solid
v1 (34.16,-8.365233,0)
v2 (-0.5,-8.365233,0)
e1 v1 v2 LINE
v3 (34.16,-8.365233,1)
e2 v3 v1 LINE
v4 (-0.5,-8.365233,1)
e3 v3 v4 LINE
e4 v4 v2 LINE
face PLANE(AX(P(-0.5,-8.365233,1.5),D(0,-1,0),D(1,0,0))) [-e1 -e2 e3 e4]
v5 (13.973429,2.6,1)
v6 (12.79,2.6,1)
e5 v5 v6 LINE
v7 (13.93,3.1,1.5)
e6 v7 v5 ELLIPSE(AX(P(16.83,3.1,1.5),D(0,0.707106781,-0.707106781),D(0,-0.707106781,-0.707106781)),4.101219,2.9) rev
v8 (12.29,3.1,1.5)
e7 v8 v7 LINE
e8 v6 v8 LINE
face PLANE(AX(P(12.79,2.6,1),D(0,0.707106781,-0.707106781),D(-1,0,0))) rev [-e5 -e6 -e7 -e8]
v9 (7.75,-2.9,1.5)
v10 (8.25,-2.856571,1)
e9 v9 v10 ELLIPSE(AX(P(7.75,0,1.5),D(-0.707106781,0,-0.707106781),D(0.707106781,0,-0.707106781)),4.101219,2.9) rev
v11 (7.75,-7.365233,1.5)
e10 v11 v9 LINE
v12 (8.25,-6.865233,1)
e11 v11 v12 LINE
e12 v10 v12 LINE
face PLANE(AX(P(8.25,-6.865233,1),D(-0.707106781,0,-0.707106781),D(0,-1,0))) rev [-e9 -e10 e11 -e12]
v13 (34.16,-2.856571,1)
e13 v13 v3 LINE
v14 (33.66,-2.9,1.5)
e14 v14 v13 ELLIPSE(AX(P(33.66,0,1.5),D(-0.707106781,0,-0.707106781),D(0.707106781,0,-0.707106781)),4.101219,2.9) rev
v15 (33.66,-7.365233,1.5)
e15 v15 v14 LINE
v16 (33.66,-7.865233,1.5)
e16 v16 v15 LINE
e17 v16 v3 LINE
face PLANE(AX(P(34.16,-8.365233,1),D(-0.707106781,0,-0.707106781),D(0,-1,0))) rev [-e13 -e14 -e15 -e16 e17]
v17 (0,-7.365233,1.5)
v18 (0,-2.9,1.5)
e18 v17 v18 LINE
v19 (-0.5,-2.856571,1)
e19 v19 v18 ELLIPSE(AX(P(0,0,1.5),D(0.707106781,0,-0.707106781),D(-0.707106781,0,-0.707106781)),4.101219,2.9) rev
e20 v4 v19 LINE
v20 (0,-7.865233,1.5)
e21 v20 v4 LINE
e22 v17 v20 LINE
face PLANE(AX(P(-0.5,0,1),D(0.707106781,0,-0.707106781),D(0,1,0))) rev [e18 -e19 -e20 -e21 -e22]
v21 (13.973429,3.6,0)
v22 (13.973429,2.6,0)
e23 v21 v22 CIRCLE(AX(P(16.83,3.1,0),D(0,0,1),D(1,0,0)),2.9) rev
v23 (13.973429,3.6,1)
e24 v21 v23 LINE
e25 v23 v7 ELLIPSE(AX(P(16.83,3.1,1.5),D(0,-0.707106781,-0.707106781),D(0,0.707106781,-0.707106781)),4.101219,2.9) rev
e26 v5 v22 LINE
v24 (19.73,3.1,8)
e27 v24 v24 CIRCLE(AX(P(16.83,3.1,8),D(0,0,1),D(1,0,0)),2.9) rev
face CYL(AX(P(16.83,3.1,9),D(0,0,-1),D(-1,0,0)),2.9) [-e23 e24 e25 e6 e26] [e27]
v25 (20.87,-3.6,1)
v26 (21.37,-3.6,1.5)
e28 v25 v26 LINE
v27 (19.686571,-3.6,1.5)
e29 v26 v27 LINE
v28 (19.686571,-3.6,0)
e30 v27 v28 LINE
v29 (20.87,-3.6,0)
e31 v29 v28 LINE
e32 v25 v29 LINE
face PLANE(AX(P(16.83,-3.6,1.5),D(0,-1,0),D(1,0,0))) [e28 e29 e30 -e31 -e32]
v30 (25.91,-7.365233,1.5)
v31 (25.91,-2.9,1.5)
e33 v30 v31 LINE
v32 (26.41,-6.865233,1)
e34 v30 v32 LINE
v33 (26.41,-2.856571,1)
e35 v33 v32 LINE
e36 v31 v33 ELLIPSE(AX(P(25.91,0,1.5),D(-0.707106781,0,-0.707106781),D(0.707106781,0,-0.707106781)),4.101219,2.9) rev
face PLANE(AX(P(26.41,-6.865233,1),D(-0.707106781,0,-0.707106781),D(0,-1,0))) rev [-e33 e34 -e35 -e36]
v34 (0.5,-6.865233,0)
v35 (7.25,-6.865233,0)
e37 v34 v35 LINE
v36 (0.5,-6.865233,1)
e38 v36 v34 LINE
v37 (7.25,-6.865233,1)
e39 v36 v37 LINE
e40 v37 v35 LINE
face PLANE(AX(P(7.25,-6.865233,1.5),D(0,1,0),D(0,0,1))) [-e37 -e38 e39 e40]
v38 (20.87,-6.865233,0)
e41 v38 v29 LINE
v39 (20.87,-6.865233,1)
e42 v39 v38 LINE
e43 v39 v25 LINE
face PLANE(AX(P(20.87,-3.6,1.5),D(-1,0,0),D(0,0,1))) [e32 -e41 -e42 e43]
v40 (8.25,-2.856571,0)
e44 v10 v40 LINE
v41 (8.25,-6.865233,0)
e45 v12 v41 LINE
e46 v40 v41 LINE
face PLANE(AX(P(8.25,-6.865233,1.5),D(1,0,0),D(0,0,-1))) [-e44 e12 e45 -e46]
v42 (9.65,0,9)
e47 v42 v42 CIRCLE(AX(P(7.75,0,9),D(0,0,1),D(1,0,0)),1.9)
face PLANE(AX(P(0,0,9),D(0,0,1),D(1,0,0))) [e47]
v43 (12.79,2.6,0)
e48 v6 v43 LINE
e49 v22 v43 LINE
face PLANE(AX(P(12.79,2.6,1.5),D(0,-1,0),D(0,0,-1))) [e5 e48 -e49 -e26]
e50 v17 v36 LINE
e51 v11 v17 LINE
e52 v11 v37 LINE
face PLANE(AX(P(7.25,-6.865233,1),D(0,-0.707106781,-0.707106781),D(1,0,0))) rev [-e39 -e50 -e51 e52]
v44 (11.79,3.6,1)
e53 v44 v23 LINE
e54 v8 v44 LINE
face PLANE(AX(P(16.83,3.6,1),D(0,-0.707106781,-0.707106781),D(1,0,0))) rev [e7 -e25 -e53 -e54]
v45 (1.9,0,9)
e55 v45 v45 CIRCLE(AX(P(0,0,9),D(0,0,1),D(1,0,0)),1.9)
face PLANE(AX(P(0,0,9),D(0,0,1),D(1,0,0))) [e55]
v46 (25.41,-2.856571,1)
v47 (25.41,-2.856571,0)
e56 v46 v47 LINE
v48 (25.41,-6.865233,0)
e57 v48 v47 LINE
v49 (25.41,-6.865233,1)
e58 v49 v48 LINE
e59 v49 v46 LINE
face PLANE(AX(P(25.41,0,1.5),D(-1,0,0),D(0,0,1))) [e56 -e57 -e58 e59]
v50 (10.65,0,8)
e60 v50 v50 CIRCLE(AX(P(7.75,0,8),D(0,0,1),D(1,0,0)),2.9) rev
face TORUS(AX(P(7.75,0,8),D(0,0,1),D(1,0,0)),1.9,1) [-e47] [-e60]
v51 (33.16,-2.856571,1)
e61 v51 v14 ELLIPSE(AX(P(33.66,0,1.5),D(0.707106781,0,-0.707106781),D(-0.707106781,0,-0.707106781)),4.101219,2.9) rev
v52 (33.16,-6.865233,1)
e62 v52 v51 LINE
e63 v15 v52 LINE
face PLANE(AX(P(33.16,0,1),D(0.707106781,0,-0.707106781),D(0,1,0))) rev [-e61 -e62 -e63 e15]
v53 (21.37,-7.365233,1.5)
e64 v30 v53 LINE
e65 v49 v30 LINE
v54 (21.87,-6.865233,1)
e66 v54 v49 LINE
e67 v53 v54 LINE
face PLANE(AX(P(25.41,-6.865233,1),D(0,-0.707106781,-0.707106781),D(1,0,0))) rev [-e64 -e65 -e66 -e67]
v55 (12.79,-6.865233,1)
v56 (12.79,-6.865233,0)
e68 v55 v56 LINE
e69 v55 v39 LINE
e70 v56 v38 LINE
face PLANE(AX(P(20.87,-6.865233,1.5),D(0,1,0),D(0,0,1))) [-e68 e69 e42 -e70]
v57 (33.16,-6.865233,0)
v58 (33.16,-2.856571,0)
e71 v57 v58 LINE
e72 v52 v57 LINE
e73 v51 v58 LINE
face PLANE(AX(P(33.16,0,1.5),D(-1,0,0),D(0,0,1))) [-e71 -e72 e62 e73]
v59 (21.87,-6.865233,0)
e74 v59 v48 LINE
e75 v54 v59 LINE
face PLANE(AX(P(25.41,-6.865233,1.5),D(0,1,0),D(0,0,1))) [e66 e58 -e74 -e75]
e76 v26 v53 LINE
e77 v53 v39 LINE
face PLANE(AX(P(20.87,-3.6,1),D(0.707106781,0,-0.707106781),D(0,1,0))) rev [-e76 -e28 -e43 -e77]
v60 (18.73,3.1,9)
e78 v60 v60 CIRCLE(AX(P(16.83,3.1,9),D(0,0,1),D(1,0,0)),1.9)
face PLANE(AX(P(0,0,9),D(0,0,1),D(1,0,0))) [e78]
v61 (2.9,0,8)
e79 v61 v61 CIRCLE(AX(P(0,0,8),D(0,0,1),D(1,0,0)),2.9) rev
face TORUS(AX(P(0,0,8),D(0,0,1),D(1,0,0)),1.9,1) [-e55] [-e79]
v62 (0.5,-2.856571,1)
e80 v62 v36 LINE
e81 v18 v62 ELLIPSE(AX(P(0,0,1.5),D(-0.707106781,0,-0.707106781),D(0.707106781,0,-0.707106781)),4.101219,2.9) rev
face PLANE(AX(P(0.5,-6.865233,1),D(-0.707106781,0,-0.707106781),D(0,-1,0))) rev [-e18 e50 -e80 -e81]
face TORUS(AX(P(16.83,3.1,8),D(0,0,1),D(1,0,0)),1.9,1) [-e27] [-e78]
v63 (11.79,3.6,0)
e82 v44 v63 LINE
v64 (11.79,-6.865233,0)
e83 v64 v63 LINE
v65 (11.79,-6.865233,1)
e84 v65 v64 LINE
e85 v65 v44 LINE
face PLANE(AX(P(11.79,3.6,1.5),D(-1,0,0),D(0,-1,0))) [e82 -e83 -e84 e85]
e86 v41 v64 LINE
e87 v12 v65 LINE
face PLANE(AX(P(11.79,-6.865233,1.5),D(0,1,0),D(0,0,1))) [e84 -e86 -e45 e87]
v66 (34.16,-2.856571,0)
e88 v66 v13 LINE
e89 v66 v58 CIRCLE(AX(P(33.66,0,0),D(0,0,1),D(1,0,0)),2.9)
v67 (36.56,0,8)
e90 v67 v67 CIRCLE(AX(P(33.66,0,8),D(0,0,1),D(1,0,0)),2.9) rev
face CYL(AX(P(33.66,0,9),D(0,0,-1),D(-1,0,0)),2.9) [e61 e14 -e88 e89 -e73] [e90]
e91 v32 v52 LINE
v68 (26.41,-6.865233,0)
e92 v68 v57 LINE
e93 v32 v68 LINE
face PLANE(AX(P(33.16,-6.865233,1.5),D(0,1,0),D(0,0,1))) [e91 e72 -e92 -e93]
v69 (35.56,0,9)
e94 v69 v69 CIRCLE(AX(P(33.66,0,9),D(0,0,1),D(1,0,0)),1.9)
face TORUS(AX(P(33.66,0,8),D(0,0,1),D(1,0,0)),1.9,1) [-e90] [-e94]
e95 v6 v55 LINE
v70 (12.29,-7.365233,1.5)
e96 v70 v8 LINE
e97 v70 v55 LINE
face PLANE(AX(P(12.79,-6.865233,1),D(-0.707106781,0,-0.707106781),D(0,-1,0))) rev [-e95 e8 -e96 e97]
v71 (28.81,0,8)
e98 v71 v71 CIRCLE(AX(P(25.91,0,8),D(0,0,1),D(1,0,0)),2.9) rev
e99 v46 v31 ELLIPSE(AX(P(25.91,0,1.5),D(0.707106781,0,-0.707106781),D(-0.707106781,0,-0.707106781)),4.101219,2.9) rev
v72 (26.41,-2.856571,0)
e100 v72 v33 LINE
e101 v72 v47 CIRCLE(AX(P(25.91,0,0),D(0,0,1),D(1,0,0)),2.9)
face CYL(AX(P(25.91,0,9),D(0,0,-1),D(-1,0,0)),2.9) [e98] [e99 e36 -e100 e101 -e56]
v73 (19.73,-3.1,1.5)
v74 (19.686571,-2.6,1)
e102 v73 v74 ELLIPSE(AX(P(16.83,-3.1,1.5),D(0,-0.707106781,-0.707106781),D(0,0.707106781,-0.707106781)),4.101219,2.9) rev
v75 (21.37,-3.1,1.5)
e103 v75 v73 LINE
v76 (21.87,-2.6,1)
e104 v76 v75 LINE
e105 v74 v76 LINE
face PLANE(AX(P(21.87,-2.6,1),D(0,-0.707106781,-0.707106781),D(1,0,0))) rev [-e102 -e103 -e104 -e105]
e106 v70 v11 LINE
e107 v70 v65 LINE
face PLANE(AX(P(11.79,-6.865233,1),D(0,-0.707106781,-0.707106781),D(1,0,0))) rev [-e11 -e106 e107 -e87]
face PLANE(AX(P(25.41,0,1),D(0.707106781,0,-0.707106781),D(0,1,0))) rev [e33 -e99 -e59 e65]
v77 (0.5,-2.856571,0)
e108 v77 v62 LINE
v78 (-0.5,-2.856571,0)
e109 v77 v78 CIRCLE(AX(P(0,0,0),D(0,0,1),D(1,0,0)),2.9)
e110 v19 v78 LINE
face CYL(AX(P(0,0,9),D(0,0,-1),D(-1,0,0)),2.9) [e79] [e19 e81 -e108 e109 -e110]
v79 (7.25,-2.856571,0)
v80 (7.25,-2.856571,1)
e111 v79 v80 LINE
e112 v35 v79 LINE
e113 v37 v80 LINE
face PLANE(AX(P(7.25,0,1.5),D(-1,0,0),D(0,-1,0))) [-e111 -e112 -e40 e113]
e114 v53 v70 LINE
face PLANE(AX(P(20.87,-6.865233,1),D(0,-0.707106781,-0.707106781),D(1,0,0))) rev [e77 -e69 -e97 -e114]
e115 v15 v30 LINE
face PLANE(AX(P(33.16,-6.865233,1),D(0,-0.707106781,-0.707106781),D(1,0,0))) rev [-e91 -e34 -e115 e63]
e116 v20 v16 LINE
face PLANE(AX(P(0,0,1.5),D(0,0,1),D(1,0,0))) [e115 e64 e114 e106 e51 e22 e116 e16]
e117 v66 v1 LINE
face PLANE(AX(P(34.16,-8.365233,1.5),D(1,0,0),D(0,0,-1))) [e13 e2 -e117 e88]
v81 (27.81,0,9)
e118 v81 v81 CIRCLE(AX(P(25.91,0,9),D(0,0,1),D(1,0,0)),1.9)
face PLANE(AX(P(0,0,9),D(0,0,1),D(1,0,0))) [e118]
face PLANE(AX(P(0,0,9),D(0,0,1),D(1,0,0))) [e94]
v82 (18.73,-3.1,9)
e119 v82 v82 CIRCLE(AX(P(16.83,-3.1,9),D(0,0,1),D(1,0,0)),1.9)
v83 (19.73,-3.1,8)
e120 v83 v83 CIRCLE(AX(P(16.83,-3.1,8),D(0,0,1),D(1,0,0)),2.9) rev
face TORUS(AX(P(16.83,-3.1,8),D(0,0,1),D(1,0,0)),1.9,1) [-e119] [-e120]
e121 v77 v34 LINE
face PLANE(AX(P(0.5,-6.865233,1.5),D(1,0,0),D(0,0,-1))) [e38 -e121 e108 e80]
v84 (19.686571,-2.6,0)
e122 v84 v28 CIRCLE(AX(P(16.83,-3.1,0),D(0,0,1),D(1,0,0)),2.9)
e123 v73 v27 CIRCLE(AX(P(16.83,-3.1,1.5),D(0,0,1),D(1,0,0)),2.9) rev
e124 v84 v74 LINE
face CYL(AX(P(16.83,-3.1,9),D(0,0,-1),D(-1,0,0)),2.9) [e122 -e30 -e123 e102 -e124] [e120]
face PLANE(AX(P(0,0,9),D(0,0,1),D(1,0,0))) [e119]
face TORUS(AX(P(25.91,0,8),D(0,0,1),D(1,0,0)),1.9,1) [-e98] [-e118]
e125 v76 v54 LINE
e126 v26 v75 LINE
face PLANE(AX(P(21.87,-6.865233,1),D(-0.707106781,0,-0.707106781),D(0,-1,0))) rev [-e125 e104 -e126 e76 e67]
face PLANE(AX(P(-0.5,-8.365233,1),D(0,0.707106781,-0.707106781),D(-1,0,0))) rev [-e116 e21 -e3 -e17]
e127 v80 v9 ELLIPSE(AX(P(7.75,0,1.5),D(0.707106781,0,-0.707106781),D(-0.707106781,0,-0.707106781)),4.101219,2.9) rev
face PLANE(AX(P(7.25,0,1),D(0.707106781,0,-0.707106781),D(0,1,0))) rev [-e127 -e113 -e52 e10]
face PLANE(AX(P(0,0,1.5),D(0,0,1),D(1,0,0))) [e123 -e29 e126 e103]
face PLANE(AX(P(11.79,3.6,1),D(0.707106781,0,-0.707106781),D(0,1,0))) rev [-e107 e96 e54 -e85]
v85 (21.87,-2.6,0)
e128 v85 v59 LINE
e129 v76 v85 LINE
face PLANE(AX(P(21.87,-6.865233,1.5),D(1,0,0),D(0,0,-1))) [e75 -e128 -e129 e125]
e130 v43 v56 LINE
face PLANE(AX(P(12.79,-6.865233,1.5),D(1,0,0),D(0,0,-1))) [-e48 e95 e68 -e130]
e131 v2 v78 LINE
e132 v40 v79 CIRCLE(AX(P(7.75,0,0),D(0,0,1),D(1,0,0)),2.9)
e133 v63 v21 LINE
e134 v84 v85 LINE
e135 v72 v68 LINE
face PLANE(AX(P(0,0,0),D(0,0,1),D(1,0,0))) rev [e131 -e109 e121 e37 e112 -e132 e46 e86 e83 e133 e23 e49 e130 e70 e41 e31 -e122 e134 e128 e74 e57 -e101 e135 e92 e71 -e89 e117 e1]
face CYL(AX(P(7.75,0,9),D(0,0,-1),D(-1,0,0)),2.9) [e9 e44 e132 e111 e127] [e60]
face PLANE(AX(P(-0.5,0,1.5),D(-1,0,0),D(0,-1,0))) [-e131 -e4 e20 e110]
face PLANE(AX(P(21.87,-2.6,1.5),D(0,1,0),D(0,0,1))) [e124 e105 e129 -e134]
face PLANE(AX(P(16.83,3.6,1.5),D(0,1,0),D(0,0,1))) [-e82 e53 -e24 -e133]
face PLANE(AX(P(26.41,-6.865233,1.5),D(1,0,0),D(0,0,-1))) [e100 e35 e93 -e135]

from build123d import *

# Parameters (mm, degrees)
SKETCH_1_R        = 2.9
EXTRUDE_1_DEPTH   = 9
EXTRUDE_1_2_DEPTH = 9
EXTRUDE_1_3_DEPTH = 9
EXTRUDE_1_4_DEPTH = 9
EXTRUDE_1_5_DEPTH = 9
EXTRUDE_1_6_DEPTH = 9
EXTRUDE_2_DEPTH   = 1.5
CHAMFER_1_SIZE    = 0.5
CHAMFER_2_SIZE    = 0.5
CHAMFER_3_SIZE    = 0.5
CHAMFER_4_SIZE    = 0.5
FILLET_2_R        = 1


with BuildPart() as part:
    # Эскиз1 → Бобышка-Вытянуть1 (new body)
    with BuildSketch(Plane.XY):
        with Locations((33.66, 0)):
            Circle(SKETCH_1_R)
    extrude(amount=EXTRUDE_1_DEPTH)



with BuildPart() as body_2:
    # Эскиз1 → Extrude 1 2 (new body)
    with BuildSketch(Plane.XY):
        with Locations((25.91, 0)):
            Circle(SKETCH_1_R)
    extrude(amount=EXTRUDE_1_2_DEPTH)


with BuildPart() as body_3:
    # Эскиз1 → Extrude 1 3 (new body)
    with BuildSketch(Plane.XY):
        with Locations((16.83, -3.1)):
            Circle(SKETCH_1_R)
    extrude(amount=EXTRUDE_1_3_DEPTH)


with BuildPart() as body_4:
    # Эскиз1 → Extrude 1 4 (new body)
    with BuildSketch(Plane.XY):
        with Locations((7.75, 0)):
            Circle(SKETCH_1_R)
    extrude(amount=EXTRUDE_1_4_DEPTH)


with BuildPart() as body_5:
    # Эскиз1 → Extrude 1 5 (new body)
    with BuildSketch(Plane.XY):
        Circle(SKETCH_1_R)
    extrude(amount=EXTRUDE_1_5_DEPTH)


with BuildPart() as body_6:
    # Эскиз1 → Extrude 1 6 (new body)
    with BuildSketch(Plane.XY):
        with Locations((16.83, 3.1)):
            Circle(SKETCH_1_R)
    extrude(amount=EXTRUDE_1_6_DEPTH)


with BuildPart() as part_1:
    add(part.part)

    add(body_2.part)  # Бобышка-Вытянуть2 merges body 2

    add(body_3.part)  # Бобышка-Вытянуть2 merges body 3

    add(body_4.part)  # Бобышка-Вытянуть2 merges body 4

    add(body_5.part)  # Бобышка-Вытянуть2 merges body 5

    add(body_6.part)  # Бобышка-Вытянуть2 merges body 6
    # Эскиз2 → Бобышка-Вытянуть2 (add)
    with BuildSketch(Plane(origin=(0, 0, 0), x_dir=(-1, 0, 0), z_dir=(0, 0, -1))):
        Polygon((0, 0), (0.5, 0), (0.5, -8.365233443), (-34.16, -8.365233443), (-34.16, 0), (-33.66, 0), (-33.16, 0), (-33.16, -6.865233443), (-26.41, -6.865233443), (-26.41, 0), (-25.41, 0), (-25.41, -6.865233443), (-21.87, -6.865233443), (-21.87, -2.6), (-16.83, -2.6), (-16.83, -3.1), (-16.83, -3.6), (-20.87, -3.6), (-20.87, -6.865233443), (-12.79, -6.865233443), (-12.79, 2.6), (-16.83, 2.6), (-16.83, 3.1), (-16.83, 3.6), (-11.79, 3.6), (-11.79, -6.865233443), (-8.25, -6.865233443), (-8.25, 0), (-7.75, 0), (-7.25, 0), (-7.25, -6.865233443), (-0.5, -6.865233443), (-0.5, 0), align=None)
    extrude(amount=-EXTRUDE_2_DEPTH)

    # Фаска1
    chamfer_1_edges = [part_1.edges().sort_by_distance(p)[0] for p in [
        (12.79, -2.132616721, 1.5),
        (16.83, -6.865233443, 1.5),
        (20.87, -5.232616721, 1.5),
        (20.778285686, -2.6, 1.5),
        (21.87, -4.732616721, 1.5),
        (25.41, -4.860902407, 1.5),
        (26.41, -4.860902407, 1.5),
        (29.785, -6.865233443, 1.5),
        (33.16, -4.860902407, 1.5),
        (16.83, -8.365233443, 1.5),
        (34.16, -5.610902407, 1.5),
    ]]
    chamfer(chamfer_1_edges, length=CHAMFER_1_SIZE - 0.0001)  # a hair under: the kernel refuses the full size

    # Фаска2
    chamfer_2_edges = [part_1.edges().sort_by_distance(p)[0] for p in [
        (13.131764314, 2.6, 1.5),
    ]]
    chamfer(chamfer_2_edges, length=CHAMFER_2_SIZE - 0.0001)  # a hair under: the kernel refuses the full size

    # Фаска3
    chamfer_3_edges = [part_1.edges().sort_by_distance(p)[0] for p in [
        (-0.5, -5.360952407, 1.5),
        (0.5, -4.860902407, 1.5),
        (3.875, -6.865233443, 1.5),
        (7.25, -4.860902407, 1.5),
        (8.25, -4.860902407, 1.5),
        (10.02, -6.865233443, 1.5),
        (11.79, -1.632616721, 1.5),
        (12.881714314, 3.6, 1.5),
    ]]
    chamfer(chamfer_3_edges, length=CHAMFER_3_SIZE - 0.0001)  # a hair under: the kernel refuses the full size

    # Фаска4
    chamfer_4_edges = [part_1.edges().sort_by_distance(p)[0] for p in [
        (23.64, -6.865233443, 1.5),
    ]]
    chamfer(chamfer_4_edges, length=CHAMFER_4_SIZE)

    # Скругление2
    fillet_2_edges = [part_1.edges().sort_by_distance(p)[0] for p in [
        (30.76, 0, 9),
        (23.01, 0, 9),
        (4.85, 0, 9),
        (-2.9, 0, 9),
        (13.93, 3.1, 9),
        (13.93, -3.1, 9),
    ]]
    fillet(fillet_2_edges, radius=FILLET_2_R)


solid = part_1.part
